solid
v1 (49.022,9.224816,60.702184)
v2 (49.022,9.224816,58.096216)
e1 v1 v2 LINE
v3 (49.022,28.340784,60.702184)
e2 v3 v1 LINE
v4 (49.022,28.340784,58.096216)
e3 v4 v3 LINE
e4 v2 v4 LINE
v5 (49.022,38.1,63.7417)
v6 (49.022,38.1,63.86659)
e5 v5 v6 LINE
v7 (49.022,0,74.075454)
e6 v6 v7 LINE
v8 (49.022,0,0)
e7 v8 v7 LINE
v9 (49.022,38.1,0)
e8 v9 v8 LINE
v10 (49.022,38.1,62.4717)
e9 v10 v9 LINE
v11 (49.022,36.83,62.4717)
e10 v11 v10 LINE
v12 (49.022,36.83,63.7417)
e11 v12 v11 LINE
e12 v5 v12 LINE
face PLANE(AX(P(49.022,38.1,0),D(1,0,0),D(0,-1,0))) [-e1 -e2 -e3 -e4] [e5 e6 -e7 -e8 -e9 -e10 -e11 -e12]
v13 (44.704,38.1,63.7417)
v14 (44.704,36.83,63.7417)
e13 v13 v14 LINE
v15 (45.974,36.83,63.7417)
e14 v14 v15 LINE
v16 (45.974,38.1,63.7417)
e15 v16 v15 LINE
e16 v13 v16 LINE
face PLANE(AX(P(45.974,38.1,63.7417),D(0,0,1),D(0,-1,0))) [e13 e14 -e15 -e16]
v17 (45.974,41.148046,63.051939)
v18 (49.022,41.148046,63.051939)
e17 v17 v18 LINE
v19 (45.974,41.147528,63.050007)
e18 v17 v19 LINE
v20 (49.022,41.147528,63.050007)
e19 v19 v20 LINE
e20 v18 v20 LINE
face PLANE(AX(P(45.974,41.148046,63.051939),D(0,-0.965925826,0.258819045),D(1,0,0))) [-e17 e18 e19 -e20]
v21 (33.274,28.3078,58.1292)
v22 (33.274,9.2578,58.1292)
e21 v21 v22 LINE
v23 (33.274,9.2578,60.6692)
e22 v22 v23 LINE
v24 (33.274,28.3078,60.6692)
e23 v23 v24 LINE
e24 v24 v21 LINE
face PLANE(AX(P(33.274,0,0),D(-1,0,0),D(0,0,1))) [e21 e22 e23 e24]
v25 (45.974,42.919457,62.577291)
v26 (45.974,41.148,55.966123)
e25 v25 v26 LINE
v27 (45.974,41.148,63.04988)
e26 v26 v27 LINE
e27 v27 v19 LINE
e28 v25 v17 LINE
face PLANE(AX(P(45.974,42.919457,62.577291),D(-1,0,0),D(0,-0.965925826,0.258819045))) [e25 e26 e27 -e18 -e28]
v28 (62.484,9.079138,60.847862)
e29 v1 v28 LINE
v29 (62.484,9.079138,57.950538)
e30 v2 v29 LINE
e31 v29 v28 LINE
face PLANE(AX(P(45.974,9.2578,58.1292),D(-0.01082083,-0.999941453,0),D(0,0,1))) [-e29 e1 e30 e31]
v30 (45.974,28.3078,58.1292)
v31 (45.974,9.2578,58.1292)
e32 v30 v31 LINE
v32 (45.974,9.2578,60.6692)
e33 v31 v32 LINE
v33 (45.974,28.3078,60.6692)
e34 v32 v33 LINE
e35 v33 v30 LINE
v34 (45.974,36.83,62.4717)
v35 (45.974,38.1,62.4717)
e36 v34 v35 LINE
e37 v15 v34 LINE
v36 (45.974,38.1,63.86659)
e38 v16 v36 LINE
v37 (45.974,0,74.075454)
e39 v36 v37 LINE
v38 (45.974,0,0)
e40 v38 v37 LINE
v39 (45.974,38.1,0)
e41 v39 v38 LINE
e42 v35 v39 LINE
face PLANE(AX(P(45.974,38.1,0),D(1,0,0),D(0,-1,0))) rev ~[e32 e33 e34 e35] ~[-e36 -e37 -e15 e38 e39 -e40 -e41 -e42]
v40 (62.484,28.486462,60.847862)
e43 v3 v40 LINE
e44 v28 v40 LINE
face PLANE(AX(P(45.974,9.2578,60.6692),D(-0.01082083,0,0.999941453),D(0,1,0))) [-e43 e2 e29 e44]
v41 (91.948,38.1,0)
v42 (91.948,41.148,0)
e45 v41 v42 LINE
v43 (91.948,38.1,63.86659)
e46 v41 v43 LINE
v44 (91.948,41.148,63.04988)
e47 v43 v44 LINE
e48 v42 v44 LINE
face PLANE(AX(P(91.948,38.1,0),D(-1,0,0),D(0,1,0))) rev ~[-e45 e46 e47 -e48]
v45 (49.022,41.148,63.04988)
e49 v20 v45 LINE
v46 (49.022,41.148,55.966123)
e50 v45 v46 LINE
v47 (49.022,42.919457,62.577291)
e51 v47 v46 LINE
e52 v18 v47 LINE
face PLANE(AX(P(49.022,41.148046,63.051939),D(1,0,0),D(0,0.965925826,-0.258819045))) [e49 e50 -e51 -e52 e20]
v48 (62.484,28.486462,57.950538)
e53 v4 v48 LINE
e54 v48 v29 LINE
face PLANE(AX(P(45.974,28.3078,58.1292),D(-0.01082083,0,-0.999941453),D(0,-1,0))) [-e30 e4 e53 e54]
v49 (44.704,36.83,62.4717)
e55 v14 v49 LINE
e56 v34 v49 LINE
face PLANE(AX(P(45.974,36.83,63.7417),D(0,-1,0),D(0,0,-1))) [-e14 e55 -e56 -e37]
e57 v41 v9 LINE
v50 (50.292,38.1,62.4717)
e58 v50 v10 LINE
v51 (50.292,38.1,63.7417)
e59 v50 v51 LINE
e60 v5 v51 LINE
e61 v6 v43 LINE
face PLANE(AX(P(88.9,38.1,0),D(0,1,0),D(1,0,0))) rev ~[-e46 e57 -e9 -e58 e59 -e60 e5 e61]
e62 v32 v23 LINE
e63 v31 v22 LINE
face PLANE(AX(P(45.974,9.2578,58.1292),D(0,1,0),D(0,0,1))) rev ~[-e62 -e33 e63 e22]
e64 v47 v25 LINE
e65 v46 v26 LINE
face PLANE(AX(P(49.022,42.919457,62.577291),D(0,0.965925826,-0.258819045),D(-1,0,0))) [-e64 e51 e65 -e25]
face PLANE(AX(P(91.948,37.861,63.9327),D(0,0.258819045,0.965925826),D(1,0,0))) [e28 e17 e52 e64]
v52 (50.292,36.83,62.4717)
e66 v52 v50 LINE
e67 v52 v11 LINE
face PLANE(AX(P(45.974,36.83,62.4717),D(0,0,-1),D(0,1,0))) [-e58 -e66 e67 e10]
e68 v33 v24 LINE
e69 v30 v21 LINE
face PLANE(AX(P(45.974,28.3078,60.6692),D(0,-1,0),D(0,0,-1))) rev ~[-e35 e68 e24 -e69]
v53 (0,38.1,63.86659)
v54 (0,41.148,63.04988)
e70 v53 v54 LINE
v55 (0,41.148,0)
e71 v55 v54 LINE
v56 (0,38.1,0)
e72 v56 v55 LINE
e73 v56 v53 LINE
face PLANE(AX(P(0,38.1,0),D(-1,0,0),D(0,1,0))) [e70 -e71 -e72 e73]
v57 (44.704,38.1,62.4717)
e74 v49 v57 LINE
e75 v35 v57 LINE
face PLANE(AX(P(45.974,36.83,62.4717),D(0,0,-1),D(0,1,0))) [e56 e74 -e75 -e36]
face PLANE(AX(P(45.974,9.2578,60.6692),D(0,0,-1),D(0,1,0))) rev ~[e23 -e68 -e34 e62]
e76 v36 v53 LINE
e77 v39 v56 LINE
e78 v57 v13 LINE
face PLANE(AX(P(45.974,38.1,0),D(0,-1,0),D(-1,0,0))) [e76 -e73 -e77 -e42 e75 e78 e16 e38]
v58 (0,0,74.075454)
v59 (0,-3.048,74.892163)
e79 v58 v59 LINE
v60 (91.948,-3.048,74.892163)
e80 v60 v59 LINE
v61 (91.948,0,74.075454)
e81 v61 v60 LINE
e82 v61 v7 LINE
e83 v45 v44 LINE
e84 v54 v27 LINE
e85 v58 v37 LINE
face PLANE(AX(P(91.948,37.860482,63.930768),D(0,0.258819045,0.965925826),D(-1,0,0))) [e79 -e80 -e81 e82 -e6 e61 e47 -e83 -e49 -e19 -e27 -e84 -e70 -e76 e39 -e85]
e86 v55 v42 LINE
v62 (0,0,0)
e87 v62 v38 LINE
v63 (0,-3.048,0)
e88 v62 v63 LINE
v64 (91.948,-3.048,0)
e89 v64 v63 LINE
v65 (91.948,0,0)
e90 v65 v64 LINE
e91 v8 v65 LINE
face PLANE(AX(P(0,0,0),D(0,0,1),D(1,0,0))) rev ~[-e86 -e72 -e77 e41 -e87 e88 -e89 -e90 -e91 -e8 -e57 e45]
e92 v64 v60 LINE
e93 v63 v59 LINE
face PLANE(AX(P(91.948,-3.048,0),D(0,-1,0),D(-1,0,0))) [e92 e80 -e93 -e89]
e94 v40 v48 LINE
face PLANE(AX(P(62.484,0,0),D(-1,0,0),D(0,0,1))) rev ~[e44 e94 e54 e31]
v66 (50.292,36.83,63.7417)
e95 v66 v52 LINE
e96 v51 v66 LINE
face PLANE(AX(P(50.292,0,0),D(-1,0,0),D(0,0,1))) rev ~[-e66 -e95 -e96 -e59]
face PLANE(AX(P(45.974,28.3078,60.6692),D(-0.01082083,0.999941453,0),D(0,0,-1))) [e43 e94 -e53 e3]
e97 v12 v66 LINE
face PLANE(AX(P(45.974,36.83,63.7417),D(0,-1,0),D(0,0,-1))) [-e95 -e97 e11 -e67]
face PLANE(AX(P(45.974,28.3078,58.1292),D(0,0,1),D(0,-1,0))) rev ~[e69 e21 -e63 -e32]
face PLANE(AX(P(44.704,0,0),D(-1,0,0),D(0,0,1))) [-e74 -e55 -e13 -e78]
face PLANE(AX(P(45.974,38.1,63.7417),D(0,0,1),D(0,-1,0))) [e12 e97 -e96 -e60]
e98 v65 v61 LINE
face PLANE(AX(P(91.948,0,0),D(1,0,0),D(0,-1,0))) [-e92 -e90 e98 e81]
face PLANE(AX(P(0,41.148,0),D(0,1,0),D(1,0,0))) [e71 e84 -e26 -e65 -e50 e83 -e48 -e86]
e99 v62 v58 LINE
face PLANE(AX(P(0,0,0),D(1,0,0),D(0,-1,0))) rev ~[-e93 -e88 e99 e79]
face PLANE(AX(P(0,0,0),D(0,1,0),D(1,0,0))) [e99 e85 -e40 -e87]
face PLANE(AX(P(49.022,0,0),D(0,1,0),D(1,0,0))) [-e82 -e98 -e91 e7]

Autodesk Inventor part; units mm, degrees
ref_plane "YZ Plane" through (0, 0, 0) normal (1, 0, 0) x (0, 1, 0)
ref_plane "XZ Plane" through (0, 0, 0) normal (0, 1, 0) x (-1, 0, 0)
sketch "Sketch1" plane through (0, 0, 0) normal (0, 0, 1) x (1, 0, 0)
  line L0 (0, 41.148) -> (91.948, 41.148)
  line L1 (91.948, -3.048) -> (0, -3.048)
  line L2 (0, 38.1) -> (0, 41.148)
  line L3 (0, 0) -> (0, -3.048)
  line L4 (88.9, 38.1) -> (91.948, 38.1)
  line L5 (88.9, 0) -> (91.948, 0)
  line L6 (91.948, 38.1) -> (91.948, 41.148)
  line L7 (91.948, 0) -> (91.948, -3.048)
  line L8 (45.974, 38.1) -> (45.974, 0)
  line L9 (49.022, 38.1) -> (49.022, 0)
  line L10 (88.9, 38.1) -> (49.022, 38.1)
  line L11 (45.974, 38.1) -> (0, 38.1)
  line L12 (0, 0) -> (45.974, 0)
  line L13 (49.022, 0) -> (88.9, 0)
  dimension "d0" = 88.9
  dimension "d17" = 3.048
extrude "Extrusion6" add sketch "Sketch1" along normal blind 76.2
ref_plane "Work Plane4" through (91.948, 37.861, 63.9327) normal (0, 0.258819, 0.9659258) x (-1, 0, 0)
ref_plane "Work Plane3" through (91.948, 41.148, 76.2) normal (0, 0.258819, 0.9659258) x (-1, 0, 0)
sketch "Sketch6" plane through (91.948, 37.861, 63.9327) normal (0, 0.258819, 0.9659258) x (-1, 0, 0)
  line L0 (-2.4638, -7.3313) -> (94.6916, -7.3313)
  line L1 (94.6916, -7.3313) -> (94.6916, 43.8286)
  line L2 (94.6916, 43.8286) -> (-2.4638, 43.8286)
  line L3 (-2.4638, 43.8286) -> (-2.4638, -7.3313)
  point P0 (91.948, 20.0239)
extrude "Extrusion7" cut sketch "Sketch6" along normal blind 25.4
sketch "Sketch7" plane through (45.974, 0, 0) normal (-1, 0, 0) x (0, 0, 1)
  line L0 (0, 38.1) -> (63.8687, 38.1) projected
  line L1 (62.4717, 38.1) -> (63.7417, 38.1)
  line L2 (63.7417, 38.1) -> (63.7417, 36.83)
  line L3 (63.7417, 36.83) -> (62.4717, 36.83)
  line L4 (62.4717, 36.83) -> (62.4717, 38.1)
  dimension "d24" = 1.27
  dimension "d25" = 1.27
  dimension "d26" = 0.127
extrude "Extrusion8" add sketch "Sketch7" along normal blind 1.27 and the other way blind 4.318
sketch "Sketch8" plane through (91.948, 37.861, 63.9327) normal (0, 0.258819, 0.9659258) x (1, 0, 0)
  line L0 (-91.948, 3.403) -> (0, 3.403) projected
  line L1 (-45.974, 3.403) -> (-42.926, 3.403)
  line L2 (-42.926, 3.403) -> (-42.926, 5.2369)
  line L3 (-42.926, 5.2369) -> (-45.974, 5.2369)
  line L4 (-45.974, 5.2369) -> (-45.974, 3.403)
  point P0 (-91.948, -20.0239)
extrude "Extrusion9" add sketch "Sketch8" against normal blind 12.7
sketch "Sketch10" plane through (45.974, 0, 0) normal (-1, 0, 0) x (0, 0, 1)
  line L0 (58.1292, 9.2578) -> (60.6692, 9.2578)
  line L1 (60.6692, 9.2578) -> (60.6692, 28.3078)
  line L2 (60.6692, 28.3078) -> (58.1292, 28.3078)
  line L3 (58.1292, 28.3078) -> (58.1292, 9.2578)
  dimension "d40" = 2.54
  dimension "d41" = 19.05
extrude "Extrusion11" add sketch "Sketch10" along normal blind 12.7 and the other way blind 16.51 draft 0.62
properties part number "2p1rim1" material "Steel, Galvanized"
